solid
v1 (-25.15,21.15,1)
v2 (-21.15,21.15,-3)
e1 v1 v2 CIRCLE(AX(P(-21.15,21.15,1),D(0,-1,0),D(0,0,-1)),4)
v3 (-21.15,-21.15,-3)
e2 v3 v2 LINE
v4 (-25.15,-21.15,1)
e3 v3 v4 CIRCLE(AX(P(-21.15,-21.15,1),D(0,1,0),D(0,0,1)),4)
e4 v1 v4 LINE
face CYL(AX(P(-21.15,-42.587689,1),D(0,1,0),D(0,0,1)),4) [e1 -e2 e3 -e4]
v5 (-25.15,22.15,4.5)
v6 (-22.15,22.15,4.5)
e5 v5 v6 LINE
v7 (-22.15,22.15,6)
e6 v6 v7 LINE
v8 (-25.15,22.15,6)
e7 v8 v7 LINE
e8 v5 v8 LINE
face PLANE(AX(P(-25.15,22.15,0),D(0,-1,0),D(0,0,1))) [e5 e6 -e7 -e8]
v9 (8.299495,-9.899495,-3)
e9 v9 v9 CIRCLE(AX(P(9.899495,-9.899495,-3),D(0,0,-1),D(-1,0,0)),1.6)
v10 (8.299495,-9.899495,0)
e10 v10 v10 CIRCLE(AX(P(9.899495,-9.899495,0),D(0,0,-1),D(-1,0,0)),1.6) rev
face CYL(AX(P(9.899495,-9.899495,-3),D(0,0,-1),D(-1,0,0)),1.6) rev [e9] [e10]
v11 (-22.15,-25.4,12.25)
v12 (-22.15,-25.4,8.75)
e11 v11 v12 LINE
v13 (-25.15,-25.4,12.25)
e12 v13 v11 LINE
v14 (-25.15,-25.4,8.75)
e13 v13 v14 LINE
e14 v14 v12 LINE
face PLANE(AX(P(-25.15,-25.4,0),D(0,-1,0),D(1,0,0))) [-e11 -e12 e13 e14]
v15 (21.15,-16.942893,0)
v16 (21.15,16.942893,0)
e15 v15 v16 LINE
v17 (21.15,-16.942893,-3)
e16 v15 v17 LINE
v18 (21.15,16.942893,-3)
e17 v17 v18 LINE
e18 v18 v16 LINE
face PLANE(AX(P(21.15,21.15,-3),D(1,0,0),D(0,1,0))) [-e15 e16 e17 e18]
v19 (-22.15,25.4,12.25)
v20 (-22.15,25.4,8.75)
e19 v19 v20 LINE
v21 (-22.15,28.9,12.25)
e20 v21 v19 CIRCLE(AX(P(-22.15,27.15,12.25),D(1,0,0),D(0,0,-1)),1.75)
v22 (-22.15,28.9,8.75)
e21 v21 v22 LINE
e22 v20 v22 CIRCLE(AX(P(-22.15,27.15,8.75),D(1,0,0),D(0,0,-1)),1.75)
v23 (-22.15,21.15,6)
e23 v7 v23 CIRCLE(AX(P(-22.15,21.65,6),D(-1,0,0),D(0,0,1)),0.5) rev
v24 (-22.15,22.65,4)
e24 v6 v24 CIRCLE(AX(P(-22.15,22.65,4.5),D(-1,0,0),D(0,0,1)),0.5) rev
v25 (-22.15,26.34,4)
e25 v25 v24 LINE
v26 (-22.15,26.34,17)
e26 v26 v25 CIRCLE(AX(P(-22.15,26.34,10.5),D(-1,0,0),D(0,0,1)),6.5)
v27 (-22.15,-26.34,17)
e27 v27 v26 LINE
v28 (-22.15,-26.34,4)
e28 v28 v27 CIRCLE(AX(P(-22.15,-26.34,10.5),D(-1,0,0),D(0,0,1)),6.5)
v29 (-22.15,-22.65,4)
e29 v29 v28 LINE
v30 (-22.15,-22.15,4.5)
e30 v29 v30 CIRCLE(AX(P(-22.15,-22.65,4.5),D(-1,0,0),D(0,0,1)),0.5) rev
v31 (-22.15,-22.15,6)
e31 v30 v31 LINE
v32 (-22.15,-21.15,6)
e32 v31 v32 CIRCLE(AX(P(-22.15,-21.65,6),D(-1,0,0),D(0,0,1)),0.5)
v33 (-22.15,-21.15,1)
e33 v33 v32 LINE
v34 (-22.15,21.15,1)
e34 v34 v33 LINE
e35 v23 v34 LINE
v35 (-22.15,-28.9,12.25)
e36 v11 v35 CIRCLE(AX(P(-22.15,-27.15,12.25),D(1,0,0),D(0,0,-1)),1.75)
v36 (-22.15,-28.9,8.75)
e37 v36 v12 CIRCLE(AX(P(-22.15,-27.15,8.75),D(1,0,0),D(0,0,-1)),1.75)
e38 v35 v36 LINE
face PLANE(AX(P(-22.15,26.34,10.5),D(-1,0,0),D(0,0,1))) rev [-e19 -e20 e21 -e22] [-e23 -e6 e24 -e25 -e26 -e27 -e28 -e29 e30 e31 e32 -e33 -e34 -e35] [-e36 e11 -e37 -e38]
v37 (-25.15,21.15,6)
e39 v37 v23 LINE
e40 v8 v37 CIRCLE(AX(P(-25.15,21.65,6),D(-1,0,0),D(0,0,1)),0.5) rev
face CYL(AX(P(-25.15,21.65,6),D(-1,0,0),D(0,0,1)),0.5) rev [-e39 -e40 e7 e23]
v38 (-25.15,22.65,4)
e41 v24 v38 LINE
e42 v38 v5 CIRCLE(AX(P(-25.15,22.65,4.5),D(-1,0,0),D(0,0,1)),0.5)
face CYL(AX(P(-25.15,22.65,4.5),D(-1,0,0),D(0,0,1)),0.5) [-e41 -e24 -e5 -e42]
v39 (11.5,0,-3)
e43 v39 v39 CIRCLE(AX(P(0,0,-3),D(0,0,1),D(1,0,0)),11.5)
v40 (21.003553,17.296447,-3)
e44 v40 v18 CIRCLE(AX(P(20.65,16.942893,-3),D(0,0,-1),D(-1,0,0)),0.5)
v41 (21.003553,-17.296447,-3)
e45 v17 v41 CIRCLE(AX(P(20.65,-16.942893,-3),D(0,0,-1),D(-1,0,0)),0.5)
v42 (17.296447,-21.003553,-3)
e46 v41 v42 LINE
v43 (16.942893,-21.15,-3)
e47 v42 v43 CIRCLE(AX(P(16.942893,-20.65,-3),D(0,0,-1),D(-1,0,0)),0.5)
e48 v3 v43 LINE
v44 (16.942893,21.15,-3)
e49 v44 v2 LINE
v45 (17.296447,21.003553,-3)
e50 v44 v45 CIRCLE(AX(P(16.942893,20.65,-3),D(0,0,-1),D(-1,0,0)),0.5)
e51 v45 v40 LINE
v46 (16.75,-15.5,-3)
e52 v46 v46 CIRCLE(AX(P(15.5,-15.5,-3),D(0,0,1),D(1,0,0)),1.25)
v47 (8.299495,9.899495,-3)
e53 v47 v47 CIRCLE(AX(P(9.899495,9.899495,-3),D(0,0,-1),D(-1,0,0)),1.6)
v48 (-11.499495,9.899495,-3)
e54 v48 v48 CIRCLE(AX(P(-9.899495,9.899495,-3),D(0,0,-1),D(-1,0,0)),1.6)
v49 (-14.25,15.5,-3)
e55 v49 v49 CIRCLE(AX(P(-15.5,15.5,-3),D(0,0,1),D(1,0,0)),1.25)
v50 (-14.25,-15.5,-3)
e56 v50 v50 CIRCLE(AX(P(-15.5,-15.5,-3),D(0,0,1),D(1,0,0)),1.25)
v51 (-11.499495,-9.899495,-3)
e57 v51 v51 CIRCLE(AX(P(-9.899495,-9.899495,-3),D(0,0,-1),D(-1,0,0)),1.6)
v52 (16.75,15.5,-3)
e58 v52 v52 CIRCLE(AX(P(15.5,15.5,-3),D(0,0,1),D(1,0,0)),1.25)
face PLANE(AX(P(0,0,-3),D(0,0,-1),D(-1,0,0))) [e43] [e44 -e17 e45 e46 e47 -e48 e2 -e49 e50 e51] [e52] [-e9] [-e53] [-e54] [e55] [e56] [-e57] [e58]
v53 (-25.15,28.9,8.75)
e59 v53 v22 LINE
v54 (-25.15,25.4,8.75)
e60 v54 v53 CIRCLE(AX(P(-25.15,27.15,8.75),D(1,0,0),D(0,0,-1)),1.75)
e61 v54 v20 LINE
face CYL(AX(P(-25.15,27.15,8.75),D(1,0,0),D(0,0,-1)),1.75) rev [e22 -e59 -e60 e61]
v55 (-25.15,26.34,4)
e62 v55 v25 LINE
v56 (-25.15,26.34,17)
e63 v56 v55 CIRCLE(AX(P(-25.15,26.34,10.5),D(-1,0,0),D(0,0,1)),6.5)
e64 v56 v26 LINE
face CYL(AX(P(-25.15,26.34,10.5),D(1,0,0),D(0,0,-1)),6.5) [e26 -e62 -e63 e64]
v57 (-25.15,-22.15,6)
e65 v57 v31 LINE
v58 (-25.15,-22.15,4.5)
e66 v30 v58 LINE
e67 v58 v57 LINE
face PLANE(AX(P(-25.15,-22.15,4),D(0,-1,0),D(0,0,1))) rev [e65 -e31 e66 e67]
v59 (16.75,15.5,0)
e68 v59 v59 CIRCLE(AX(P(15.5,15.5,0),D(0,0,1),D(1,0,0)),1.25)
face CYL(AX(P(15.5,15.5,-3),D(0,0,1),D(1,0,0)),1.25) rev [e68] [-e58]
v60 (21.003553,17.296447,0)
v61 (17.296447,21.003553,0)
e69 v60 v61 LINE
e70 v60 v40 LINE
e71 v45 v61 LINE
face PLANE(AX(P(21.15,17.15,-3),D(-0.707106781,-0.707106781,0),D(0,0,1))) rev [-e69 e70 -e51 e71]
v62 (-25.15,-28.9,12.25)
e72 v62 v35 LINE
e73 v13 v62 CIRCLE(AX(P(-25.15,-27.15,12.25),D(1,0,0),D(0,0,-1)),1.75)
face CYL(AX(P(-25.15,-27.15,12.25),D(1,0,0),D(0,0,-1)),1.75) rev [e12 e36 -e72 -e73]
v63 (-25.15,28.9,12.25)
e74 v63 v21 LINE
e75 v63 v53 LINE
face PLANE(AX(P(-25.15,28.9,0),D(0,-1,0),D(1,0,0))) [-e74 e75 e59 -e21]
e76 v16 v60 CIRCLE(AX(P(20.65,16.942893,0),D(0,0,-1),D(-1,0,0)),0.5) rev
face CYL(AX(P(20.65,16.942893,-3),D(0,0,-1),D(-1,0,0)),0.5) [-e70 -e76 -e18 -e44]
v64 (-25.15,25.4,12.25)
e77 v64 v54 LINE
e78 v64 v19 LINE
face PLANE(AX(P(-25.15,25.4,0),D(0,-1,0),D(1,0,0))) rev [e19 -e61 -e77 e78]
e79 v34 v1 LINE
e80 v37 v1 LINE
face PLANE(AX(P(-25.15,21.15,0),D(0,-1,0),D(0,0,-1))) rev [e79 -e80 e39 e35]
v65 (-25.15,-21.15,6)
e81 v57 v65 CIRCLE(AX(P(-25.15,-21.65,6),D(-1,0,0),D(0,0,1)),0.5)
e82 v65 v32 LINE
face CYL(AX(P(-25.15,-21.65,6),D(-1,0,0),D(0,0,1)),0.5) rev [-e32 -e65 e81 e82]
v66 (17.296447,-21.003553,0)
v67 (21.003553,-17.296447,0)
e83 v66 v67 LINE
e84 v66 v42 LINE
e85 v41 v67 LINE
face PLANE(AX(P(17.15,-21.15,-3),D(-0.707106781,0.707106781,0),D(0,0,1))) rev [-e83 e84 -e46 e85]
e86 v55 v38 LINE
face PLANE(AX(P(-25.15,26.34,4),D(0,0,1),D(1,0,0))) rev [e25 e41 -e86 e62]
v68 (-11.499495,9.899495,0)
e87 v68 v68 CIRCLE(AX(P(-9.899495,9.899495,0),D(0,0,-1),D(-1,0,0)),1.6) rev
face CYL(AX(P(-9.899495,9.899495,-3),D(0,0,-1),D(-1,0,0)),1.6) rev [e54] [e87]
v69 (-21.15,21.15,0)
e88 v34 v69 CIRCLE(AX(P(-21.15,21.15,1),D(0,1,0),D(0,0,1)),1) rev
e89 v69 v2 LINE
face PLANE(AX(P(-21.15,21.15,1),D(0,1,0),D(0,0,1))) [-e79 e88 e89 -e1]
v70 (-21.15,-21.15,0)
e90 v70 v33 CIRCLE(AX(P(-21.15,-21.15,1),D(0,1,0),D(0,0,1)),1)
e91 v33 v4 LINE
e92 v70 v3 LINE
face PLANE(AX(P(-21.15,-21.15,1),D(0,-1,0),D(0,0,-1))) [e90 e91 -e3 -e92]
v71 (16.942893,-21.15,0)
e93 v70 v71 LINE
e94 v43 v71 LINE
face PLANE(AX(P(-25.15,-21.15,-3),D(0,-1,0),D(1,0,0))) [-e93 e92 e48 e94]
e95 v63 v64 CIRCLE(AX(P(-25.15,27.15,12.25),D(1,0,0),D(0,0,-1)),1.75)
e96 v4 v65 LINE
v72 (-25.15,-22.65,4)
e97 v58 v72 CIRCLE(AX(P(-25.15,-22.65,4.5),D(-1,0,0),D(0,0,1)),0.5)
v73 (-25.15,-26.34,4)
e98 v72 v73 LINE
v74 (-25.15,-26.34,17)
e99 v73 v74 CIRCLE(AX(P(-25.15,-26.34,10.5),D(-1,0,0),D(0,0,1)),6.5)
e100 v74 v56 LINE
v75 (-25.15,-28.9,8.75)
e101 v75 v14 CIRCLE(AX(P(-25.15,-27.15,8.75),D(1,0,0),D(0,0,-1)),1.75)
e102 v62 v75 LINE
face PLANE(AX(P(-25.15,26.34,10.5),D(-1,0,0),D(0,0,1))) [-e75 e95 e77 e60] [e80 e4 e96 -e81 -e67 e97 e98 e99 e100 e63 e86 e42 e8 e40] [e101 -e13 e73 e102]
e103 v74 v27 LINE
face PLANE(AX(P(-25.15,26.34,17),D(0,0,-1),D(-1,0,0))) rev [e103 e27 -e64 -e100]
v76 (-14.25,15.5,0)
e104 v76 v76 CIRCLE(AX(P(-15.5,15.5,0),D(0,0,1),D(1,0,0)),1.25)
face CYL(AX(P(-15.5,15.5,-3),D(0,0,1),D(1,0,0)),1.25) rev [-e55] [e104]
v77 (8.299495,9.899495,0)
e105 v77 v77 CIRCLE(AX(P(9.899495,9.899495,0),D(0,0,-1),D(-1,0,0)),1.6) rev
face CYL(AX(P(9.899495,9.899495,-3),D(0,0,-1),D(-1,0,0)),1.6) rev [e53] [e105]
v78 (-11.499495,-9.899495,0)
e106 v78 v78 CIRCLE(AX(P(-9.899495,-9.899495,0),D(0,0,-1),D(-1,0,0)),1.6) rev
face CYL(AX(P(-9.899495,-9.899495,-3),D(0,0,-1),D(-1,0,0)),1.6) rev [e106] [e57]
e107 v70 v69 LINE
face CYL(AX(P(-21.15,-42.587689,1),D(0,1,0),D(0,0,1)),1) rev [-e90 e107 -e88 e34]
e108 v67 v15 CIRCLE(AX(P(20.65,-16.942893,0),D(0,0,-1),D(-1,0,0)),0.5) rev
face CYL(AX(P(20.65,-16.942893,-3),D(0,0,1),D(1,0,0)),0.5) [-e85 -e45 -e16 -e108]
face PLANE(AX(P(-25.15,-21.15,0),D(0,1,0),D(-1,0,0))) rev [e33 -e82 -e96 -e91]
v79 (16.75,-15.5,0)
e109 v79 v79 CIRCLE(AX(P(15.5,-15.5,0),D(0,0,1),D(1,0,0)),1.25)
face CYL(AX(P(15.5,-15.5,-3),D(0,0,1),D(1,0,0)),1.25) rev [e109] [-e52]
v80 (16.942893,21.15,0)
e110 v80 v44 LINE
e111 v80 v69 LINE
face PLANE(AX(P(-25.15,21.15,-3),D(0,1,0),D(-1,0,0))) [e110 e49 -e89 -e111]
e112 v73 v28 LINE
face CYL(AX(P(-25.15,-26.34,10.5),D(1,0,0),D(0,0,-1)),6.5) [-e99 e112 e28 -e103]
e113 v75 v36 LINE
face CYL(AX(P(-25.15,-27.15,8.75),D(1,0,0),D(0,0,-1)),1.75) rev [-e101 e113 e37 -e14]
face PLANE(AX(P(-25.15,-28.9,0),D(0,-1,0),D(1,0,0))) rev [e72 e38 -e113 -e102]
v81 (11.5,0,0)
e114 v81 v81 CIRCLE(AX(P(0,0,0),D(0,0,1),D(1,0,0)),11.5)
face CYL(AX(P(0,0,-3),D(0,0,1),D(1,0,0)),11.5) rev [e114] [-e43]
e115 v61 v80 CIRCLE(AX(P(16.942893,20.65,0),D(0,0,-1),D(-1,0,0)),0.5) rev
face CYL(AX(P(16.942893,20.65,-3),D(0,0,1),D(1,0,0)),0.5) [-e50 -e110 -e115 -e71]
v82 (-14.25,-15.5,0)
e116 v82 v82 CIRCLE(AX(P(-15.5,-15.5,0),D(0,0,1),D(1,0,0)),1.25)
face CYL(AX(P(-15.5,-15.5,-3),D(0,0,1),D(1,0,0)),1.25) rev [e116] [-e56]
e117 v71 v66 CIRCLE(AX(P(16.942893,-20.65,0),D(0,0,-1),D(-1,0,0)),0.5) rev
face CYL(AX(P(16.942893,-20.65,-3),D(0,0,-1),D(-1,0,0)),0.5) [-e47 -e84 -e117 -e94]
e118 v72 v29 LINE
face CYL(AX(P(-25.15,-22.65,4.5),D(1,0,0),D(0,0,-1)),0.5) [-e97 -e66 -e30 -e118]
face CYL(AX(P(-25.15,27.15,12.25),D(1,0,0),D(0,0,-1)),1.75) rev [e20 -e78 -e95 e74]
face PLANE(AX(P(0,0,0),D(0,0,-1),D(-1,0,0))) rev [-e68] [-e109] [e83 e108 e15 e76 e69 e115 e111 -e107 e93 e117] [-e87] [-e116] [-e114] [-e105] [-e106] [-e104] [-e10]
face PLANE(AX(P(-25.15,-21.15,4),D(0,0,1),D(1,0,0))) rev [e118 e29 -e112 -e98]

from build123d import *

# Parameters (mm, degrees)
CROQUIS1_W                       = 46.3
CROQUIS1_H                       = 42.3
CROQUIS1_R                       = 11.5
CROQUIS1_R_2                     = 1.25
BRIDA_BASE1_DEPTH                = 3
STRUCTURE_SUPORT_STRIP_W         = 14
STRUCTURE_SUPORT_STRIP_H         = 3
STRUCTURE_SUPORT_STRIP_CUT_DEPTH = 42.3
STRUCTURE_SUPORT_DEPTH           = 42.3
STRUCTURE_SUPORT_FLAT_DEPTH      = 3
CROQUIS13_R                      = 1.75
CORTAR_EXTRUIR2_DEPTH            = 57.94168596
DESDOBLAR2_DEPTH                 = 17
DESDOBLAR2_START                 = -3
DESDOBLAR2_2_DEPTH               = 3
DOBLAR2_START                    = -41.076990817
DOBLAR2_OUTLINE_W                = 57.8
DOBLAR2_OUTLINE_H                = 3
DOBLAR2_DEPTH                    = 16
DOBLAR2_START_2                  = -24.77248
DOBLAR2_2_DEPTH                  = 2.62248
DOBLAR2_START_3                  = -25.15
DOBLAR2_3_DEPTH                  = 4
DOBLAR2_START_4                  = -34
DOBLAR2_4_DEPTH                  = 68
CHAFL_N1_SIZE                    = 4
TALADRO_DE_MARGEN_PARA_M31_D     = 3.2
CORTAR_EXTRUIR6_REACH            = 58.942
REDONDEO2_R                      = 0.5


with BuildPart() as part:
    # Brida base1: sheet metal written as solids
    # Croquis1 → Brida base1 (new body)
    with BuildSketch(Plane.XY):
        with Locations((-2, 0)):
            Rectangle(CROQUIS1_W, CROQUIS1_H)
        Circle(CROQUIS1_R, mode=Mode.SUBTRACT)
        with Locations((-15.5, 15.5)):
            Circle(CROQUIS1_R_2, mode=Mode.SUBTRACT)
        with Locations((-15.5, -15.5)):
            Circle(CROQUIS1_R_2, mode=Mode.SUBTRACT)
        with Locations((15.5, -15.5)):
            Circle(CROQUIS1_R_2, mode=Mode.SUBTRACT)
        with Locations((15.5, 15.5)):
            Circle(CROQUIS1_R_2, mode=Mode.SUBTRACT)
    extrude(amount=-BRIDA_BASE1_DEPTH)

    # Structure Suport: sheet metal written as solids
    # Structure Suport strip (on a plane across the edge) → Structure Suport strip cut (cut)
    with BuildSketch(Plane(origin=(-25.15, 21.15, 0), x_dir=(1, 0, 0), z_dir=(0, -1, 0))):
        with Locations((-3, -1.5)):
            Rectangle(STRUCTURE_SUPORT_STRIP_W, STRUCTURE_SUPORT_STRIP_H)
    extrude(amount=STRUCTURE_SUPORT_STRIP_CUT_DEPTH, mode=Mode.SUBTRACT)

    # Structure Suport bend section (on a plane across the edge) → Structure Suport (add)
    with BuildSketch(Plane(origin=(-25.15, 21.15, 0), x_dir=(1, 0, 0), z_dir=(0, -1, 0))):
        with BuildLine():
            Line((0, 1), (3, 1))
            ThreePointArc((3, 1), (3.292893219, 0.292893219), (4, 0))
            Line((4, 0), (4, -3))
            ThreePointArc((4, -3), (1.171572875, -1.828427125), (0, 1))
        make_face()
    extrude(amount=STRUCTURE_SUPORT_DEPTH)

    # Structure Suport profile (on flange) → Structure Suport flat (add)
    with BuildSketch(Plane(origin=(-25.15, 0, 0), x_dir=(0, -1, 0), z_dir=(-1, 0, 0))):
        with BuildLine():
            ThreePointArc((-26.34, 17), (-32.84, 10.5), (-26.34, 4))
            Line((-26.34, 4), (-21.15, 4))
            Line((-21.15, 4), (-21.15, 1))
            Line((-21.15, 1), (21.15, 1))
            Line((21.15, 1), (21.15, 4))
            Line((21.15, 4), (26.34, 4))
            ThreePointArc((26.34, 4), (32.84, 10.5), (26.34, 17))
            Line((26.34, 17), (-26.34, 17))
        make_face()
    extrude(amount=-STRUCTURE_SUPORT_FLAT_DEPTH)

    # Croquis13 → Cortar-Extruir2 (cut, through all)
    with BuildSketch(Plane(origin=(-22.15, 0, 0), x_dir=(0, 0, -1), z_dir=(1, 0, 0))):
        with Locations((-10.5, 27.15)):
            Circle(CROQUIS13_R)
        with BuildLine():
            Line((-10.5, 28.9), (-12.25, 28.9))
            ThreePointArc((-12.25, 28.9), (-14, 27.15), (-12.25, 25.4))
            Line((-12.25, 25.4), (-10.5, 25.4))
            ThreePointArc((-10.5, 25.4), (-12.25, 27.15), (-10.5, 28.9))
        make_face()
        with BuildLine():
            Line((-8.75, 28.9), (-10.5, 28.9))
            ThreePointArc((-10.5, 28.9), (-9.262563133, 28.387436867), (-8.75, 27.15))
            ThreePointArc((-8.75, 27.15), (-9.262563133, 25.912563133), (-10.5, 25.4))
            Line((-10.5, 25.4), (-8.75, 25.4))
            ThreePointArc((-8.75, 25.4), (-7, 27.15), (-8.75, 28.9))
        make_face()
        with Locations((-10.5, -27.15)):
            Circle(CROQUIS13_R)
        with BuildLine():
            Line((-10.5, -25.4), (-12.25, -25.4))
            ThreePointArc((-12.25, -25.4), (-14, -27.15), (-12.25, -28.9))
            Line((-12.25, -28.9), (-10.5, -28.9))
            ThreePointArc((-10.5, -28.9), (-12.25, -27.15), (-10.5, -25.4))
        make_face()
        with BuildLine():
            Line((-8.75, -25.4), (-10.5, -25.4))
            ThreePointArc((-10.5, -25.4), (-9.262563133, -25.912563133), (-8.75, -27.15))
            ThreePointArc((-8.75, -27.15), (-9.262563133, -28.387436867), (-10.5, -28.9))
            Line((-10.5, -28.9), (-8.75, -28.9))
            ThreePointArc((-8.75, -28.9), (-7, -27.15), (-8.75, -25.4))
        make_face()
    extrude(amount=-CORTAR_EXTRUIR2_DEPTH, mode=Mode.SUBTRACT)

    # Desdoblar2: read off the stored shape, not the designer's step
    # Desdoblar2 outline → Desdoblar2 (cut)
    with BuildSketch(Plane.XY):
        Polygon((-25.15, -34), (-22.15, -34), (-22.15, -21.15), (-20, -21.15), (-20, 21.15), (-22.15, 21.15), (-22.15, 34), (-25.15, 34), align=None)
    extrude(amount=DESDOBLAR2_DEPTH, mode=Mode.SUBTRACT)

    # Desdoblar2 2 outline → Desdoblar2 2 (add)
    with BuildSketch(Plane.XY.offset(DESDOBLAR2_START)):
        with BuildLine():
            Line((-28.076990817, 21.15), (-28.076990817, 26.34))
            ThreePointArc((-28.076990817, 26.34), (-34.576990817, 32.84), (-41.076990817, 26.34))
            Line((-41.076990817, 26.34), (-41.076990817, -26.34))
            ThreePointArc((-41.076990817, -26.34), (-34.576990817, -32.84), (-28.076990817, -26.34))
            Line((-28.076990817, -26.34), (-28.076990817, -21.15))
            Line((-28.076990817, -21.15), (-20, -21.15))
            Line((-20, -21.15), (-20, 21.15))
            Line((-20, 21.15), (-28.076990817, 21.15))
        make_face()
        with BuildLine():
            Line((-36.326990817, -25.4), (-32.826990817, -25.4))
            ThreePointArc((-32.826990817, -25.4), (-31.076990817, -27.15), (-32.826990817, -28.9))
            Line((-32.826990817, -28.9), (-36.326990817, -28.9))
            ThreePointArc((-36.326990817, -28.9), (-38.076990817, -27.15), (-36.326990817, -25.4))
        make_face(mode=Mode.SUBTRACT)
        with BuildLine():
            Line((-32.826990817, 25.4), (-36.326990817, 25.4))
            ThreePointArc((-36.326990817, 25.4), (-38.076990817, 27.15), (-36.326990817, 28.9))
            Line((-36.326990817, 28.9), (-32.826990817, 28.9))
            ThreePointArc((-32.826990817, 28.9), (-31.076990817, 27.15), (-32.826990817, 25.4))
        make_face(mode=Mode.SUBTRACT)
    extrude(amount=DESDOBLAR2_2_DEPTH)

    # Doblar2: read off the stored shape, not the designer's step
    # Doblar2 outline → Doblar2 (cut)
    with BuildSketch(Plane.YZ.offset(DOBLAR2_START)):
        with Locations((0, -1.5)):
            Rectangle(DOBLAR2_OUTLINE_W, DOBLAR2_OUTLINE_H)
    extrude(amount=DOBLAR2_DEPTH, mode=Mode.SUBTRACT)

    # Doblar2 2 outline → Doblar2 2 (add)
    with BuildSketch(Plane.YZ.offset(DOBLAR2_START_2)):
        with BuildLine():
            Line((21.15, 0), (21.15, 4))
            Line((21.15, 4), (26.34, 4))
            ThreePointArc((26.34, 4), (32.84, 10.5), (26.34, 17))
            Line((26.34, 17), (-26.34, 17))
            ThreePointArc((-26.34, 17), (-32.84, 10.5), (-26.34, 4))
            Line((-26.34, 4), (-21.15, 4))
            Line((-21.15, 4), (-21.15, 0))
            Line((-21.15, 0), (21.15, 0))
        make_face()
        with BuildLine():
            ThreePointArc((-28.9, 12.25), (-27.15, 14), (-25.4, 12.25))
            Line((-25.4, 12.25), (-25.4, 8.75))
            ThreePointArc((-25.4, 8.75), (-27.15, 7), (-28.9, 8.75))
            Line((-28.9, 8.75), (-28.9, 12.25))
        make_face(mode=Mode.SUBTRACT)
        with BuildLine():
            ThreePointArc((25.4, 12.25), (27.15, 14), (28.9, 12.25))
            Line((28.9, 12.25), (28.9, 8.75))
            ThreePointArc((28.9, 8.75), (27.15, 7), (25.4, 8.75))
            Line((25.4, 8.75), (25.4, 12.25))
        make_face(mode=Mode.SUBTRACT)
    extrude(amount=DOBLAR2_2_DEPTH)

    # Doblar2 3 outline → Doblar2 3 (add)
    with BuildSketch(Plane.YZ.offset(DOBLAR2_START_3)):
        with BuildLine():
            Line((21.15, 0), (21.15, 4))
            Line((21.15, 4), (26.34, 4))
            ThreePointArc((26.34, 4), (32.84, 10.5), (26.34, 17))
            Line((26.34, 17), (-26.34, 17))
            ThreePointArc((-26.34, 17), (-32.84, 10.5), (-26.34, 4))
            Line((-26.34, 4), (-21.15, 4))
            Line((-21.15, 4), (-21.15, 0))
            Line((-21.15, 0), (21.15, 0))
        make_face()
        with BuildLine():
            ThreePointArc((-28.9, 12.25), (-27.15, 14), (-25.4, 12.25))
            Line((-25.4, 12.25), (-25.4, 8.75))
            ThreePointArc((-25.4, 8.75), (-27.15, 7), (-28.9, 8.75))
            Line((-28.9, 8.75), (-28.9, 12.25))
        make_face(mode=Mode.SUBTRACT)
        with BuildLine():
            ThreePointArc((25.4, 12.25), (27.15, 14), (28.9, 12.25))
            Line((28.9, 12.25), (28.9, 8.75))
            ThreePointArc((28.9, 8.75), (27.15, 7), (25.4, 8.75))
            Line((25.4, 8.75), (25.4, 12.25))
        make_face(mode=Mode.SUBTRACT)
    extrude(amount=DOBLAR2_3_DEPTH)

    # Doblar2 4 outline → Doblar2 4 (cut)
    with BuildSketch(Plane(origin=(0, 0, 0), x_dir=(1, 0, 0), z_dir=(0, 1, 0)).offset(DOBLAR2_START_4)):
        with BuildLine():
            ThreePointArc((-21.15, 0), (-21.857106781, -0.292893219), (-22.15, -1))
            Line((-22.15, -1), (-22.15, -17))
            Line((-22.15, -17), (-21.15, -17))
            Line((-21.15, -17), (-21.15, 0))
        make_face()
        with BuildLine():
            Line((-25.15, -17), (-25.15, -1))
            ThreePointArc((-25.15, -1), (-23.978427125, 1.828427125), (-21.15, 3))
            Line((-21.15, 3), (-20, 3))
            Line((-20, 3), (-20, 5))
            Line((-20, 5), (-42, 5))
            Line((-42, 5), (-42, -17))
            Line((-42, -17), (-25.15, -17))
        make_face()
    extrude(amount=DOBLAR2_4_DEPTH, mode=Mode.SUBTRACT)

    # Chaflán1
    chafl_n1_edges = [part.edges().sort_by_distance(p)[0] for p in [
        (21.15, 21.15, -1.5),
        (21.15, -21.15, -1.5),
    ]]
    chamfer(chafl_n1_edges, length=CHAFL_N1_SIZE)

    # Taladro de margen para M31 (through all)
    with Locations(Plane(origin=(0, 0, -3), x_dir=(-1, 0, 0), z_dir=(0, 0, -1))):
        with Locations((9.899494937, -9.899494937), (-9.899494937, -9.899494937), (-9.899494937, 9.899494937), (9.899494937, 9.899494937)):
            Hole(TALADRO_DE_MARGEN_PARA_M31_D / 2)

    # Croquis34 → Cortar-Extruir6 (cut, up to next)
    with BuildSketch(Plane(origin=(-22.15, 0, 0), x_dir=(0, 0, -1), z_dir=(1, 0, 0)), mode=Mode.PRIVATE) as cortar_extruir6_sk1:
        with BuildLine():
            Line((-6, 21.15), (-4, 21.15))
            Line((-4, 21.15), (-4, 22.15))
            Line((-4, 22.15), (-6, 22.15))
            ThreePointArc((-6, 22.15), (-6.5, 21.65), (-6, 21.15))
        make_face()
    cortar_extruir6_tool1 = extrude(cortar_extruir6_sk1.sketch, amount=-CORTAR_EXTRUIR6_REACH, mode=Mode.PRIVATE) & part.part
    # Croquis34 → Cortar-Extruir6 (cut, up to next)
    with BuildSketch(Plane(origin=(-22.15, 0, 0), x_dir=(0, 0, -1), z_dir=(1, 0, 0)), mode=Mode.PRIVATE) as cortar_extruir6_sk2:
        with BuildLine():
            Line((-4, -22.15), (-6, -22.15))
            ThreePointArc((-6, -22.15), (-6.5, -21.65), (-6, -21.15))
            Line((-6, -21.15), (-4, -21.15))
            Line((-4, -21.15), (-4, -22.15))
        make_face()
    cortar_extruir6_tool2 = extrude(cortar_extruir6_sk2.sketch, amount=-CORTAR_EXTRUIR6_REACH, mode=Mode.PRIVATE) & part.part
    add(cortar_extruir6_tool1.solids().sort_by_distance((-22.15, 21.65, 5.198952))[0], mode=Mode.SUBTRACT)
    add(cortar_extruir6_tool2.solids().sort_by_distance((-22.15, -21.65, 5.198952))[0], mode=Mode.SUBTRACT)

    # Redondeo2
    redondeo2_edges = [part.edges().sort_by_distance(p)[0] for p in [
        (21.15, -17.15, -1.5),
        (21.15, 17.15, -1.5),
        (17.15, 21.15, -1.5),
        (17.15, -21.15, -1.5),
        (-23.65, -22.15, 4),
        (-23.65, 22.15, 4),
    ]]
    fillet(redondeo2_edges, radius=REDONDEO2_R)


solid = part.part
